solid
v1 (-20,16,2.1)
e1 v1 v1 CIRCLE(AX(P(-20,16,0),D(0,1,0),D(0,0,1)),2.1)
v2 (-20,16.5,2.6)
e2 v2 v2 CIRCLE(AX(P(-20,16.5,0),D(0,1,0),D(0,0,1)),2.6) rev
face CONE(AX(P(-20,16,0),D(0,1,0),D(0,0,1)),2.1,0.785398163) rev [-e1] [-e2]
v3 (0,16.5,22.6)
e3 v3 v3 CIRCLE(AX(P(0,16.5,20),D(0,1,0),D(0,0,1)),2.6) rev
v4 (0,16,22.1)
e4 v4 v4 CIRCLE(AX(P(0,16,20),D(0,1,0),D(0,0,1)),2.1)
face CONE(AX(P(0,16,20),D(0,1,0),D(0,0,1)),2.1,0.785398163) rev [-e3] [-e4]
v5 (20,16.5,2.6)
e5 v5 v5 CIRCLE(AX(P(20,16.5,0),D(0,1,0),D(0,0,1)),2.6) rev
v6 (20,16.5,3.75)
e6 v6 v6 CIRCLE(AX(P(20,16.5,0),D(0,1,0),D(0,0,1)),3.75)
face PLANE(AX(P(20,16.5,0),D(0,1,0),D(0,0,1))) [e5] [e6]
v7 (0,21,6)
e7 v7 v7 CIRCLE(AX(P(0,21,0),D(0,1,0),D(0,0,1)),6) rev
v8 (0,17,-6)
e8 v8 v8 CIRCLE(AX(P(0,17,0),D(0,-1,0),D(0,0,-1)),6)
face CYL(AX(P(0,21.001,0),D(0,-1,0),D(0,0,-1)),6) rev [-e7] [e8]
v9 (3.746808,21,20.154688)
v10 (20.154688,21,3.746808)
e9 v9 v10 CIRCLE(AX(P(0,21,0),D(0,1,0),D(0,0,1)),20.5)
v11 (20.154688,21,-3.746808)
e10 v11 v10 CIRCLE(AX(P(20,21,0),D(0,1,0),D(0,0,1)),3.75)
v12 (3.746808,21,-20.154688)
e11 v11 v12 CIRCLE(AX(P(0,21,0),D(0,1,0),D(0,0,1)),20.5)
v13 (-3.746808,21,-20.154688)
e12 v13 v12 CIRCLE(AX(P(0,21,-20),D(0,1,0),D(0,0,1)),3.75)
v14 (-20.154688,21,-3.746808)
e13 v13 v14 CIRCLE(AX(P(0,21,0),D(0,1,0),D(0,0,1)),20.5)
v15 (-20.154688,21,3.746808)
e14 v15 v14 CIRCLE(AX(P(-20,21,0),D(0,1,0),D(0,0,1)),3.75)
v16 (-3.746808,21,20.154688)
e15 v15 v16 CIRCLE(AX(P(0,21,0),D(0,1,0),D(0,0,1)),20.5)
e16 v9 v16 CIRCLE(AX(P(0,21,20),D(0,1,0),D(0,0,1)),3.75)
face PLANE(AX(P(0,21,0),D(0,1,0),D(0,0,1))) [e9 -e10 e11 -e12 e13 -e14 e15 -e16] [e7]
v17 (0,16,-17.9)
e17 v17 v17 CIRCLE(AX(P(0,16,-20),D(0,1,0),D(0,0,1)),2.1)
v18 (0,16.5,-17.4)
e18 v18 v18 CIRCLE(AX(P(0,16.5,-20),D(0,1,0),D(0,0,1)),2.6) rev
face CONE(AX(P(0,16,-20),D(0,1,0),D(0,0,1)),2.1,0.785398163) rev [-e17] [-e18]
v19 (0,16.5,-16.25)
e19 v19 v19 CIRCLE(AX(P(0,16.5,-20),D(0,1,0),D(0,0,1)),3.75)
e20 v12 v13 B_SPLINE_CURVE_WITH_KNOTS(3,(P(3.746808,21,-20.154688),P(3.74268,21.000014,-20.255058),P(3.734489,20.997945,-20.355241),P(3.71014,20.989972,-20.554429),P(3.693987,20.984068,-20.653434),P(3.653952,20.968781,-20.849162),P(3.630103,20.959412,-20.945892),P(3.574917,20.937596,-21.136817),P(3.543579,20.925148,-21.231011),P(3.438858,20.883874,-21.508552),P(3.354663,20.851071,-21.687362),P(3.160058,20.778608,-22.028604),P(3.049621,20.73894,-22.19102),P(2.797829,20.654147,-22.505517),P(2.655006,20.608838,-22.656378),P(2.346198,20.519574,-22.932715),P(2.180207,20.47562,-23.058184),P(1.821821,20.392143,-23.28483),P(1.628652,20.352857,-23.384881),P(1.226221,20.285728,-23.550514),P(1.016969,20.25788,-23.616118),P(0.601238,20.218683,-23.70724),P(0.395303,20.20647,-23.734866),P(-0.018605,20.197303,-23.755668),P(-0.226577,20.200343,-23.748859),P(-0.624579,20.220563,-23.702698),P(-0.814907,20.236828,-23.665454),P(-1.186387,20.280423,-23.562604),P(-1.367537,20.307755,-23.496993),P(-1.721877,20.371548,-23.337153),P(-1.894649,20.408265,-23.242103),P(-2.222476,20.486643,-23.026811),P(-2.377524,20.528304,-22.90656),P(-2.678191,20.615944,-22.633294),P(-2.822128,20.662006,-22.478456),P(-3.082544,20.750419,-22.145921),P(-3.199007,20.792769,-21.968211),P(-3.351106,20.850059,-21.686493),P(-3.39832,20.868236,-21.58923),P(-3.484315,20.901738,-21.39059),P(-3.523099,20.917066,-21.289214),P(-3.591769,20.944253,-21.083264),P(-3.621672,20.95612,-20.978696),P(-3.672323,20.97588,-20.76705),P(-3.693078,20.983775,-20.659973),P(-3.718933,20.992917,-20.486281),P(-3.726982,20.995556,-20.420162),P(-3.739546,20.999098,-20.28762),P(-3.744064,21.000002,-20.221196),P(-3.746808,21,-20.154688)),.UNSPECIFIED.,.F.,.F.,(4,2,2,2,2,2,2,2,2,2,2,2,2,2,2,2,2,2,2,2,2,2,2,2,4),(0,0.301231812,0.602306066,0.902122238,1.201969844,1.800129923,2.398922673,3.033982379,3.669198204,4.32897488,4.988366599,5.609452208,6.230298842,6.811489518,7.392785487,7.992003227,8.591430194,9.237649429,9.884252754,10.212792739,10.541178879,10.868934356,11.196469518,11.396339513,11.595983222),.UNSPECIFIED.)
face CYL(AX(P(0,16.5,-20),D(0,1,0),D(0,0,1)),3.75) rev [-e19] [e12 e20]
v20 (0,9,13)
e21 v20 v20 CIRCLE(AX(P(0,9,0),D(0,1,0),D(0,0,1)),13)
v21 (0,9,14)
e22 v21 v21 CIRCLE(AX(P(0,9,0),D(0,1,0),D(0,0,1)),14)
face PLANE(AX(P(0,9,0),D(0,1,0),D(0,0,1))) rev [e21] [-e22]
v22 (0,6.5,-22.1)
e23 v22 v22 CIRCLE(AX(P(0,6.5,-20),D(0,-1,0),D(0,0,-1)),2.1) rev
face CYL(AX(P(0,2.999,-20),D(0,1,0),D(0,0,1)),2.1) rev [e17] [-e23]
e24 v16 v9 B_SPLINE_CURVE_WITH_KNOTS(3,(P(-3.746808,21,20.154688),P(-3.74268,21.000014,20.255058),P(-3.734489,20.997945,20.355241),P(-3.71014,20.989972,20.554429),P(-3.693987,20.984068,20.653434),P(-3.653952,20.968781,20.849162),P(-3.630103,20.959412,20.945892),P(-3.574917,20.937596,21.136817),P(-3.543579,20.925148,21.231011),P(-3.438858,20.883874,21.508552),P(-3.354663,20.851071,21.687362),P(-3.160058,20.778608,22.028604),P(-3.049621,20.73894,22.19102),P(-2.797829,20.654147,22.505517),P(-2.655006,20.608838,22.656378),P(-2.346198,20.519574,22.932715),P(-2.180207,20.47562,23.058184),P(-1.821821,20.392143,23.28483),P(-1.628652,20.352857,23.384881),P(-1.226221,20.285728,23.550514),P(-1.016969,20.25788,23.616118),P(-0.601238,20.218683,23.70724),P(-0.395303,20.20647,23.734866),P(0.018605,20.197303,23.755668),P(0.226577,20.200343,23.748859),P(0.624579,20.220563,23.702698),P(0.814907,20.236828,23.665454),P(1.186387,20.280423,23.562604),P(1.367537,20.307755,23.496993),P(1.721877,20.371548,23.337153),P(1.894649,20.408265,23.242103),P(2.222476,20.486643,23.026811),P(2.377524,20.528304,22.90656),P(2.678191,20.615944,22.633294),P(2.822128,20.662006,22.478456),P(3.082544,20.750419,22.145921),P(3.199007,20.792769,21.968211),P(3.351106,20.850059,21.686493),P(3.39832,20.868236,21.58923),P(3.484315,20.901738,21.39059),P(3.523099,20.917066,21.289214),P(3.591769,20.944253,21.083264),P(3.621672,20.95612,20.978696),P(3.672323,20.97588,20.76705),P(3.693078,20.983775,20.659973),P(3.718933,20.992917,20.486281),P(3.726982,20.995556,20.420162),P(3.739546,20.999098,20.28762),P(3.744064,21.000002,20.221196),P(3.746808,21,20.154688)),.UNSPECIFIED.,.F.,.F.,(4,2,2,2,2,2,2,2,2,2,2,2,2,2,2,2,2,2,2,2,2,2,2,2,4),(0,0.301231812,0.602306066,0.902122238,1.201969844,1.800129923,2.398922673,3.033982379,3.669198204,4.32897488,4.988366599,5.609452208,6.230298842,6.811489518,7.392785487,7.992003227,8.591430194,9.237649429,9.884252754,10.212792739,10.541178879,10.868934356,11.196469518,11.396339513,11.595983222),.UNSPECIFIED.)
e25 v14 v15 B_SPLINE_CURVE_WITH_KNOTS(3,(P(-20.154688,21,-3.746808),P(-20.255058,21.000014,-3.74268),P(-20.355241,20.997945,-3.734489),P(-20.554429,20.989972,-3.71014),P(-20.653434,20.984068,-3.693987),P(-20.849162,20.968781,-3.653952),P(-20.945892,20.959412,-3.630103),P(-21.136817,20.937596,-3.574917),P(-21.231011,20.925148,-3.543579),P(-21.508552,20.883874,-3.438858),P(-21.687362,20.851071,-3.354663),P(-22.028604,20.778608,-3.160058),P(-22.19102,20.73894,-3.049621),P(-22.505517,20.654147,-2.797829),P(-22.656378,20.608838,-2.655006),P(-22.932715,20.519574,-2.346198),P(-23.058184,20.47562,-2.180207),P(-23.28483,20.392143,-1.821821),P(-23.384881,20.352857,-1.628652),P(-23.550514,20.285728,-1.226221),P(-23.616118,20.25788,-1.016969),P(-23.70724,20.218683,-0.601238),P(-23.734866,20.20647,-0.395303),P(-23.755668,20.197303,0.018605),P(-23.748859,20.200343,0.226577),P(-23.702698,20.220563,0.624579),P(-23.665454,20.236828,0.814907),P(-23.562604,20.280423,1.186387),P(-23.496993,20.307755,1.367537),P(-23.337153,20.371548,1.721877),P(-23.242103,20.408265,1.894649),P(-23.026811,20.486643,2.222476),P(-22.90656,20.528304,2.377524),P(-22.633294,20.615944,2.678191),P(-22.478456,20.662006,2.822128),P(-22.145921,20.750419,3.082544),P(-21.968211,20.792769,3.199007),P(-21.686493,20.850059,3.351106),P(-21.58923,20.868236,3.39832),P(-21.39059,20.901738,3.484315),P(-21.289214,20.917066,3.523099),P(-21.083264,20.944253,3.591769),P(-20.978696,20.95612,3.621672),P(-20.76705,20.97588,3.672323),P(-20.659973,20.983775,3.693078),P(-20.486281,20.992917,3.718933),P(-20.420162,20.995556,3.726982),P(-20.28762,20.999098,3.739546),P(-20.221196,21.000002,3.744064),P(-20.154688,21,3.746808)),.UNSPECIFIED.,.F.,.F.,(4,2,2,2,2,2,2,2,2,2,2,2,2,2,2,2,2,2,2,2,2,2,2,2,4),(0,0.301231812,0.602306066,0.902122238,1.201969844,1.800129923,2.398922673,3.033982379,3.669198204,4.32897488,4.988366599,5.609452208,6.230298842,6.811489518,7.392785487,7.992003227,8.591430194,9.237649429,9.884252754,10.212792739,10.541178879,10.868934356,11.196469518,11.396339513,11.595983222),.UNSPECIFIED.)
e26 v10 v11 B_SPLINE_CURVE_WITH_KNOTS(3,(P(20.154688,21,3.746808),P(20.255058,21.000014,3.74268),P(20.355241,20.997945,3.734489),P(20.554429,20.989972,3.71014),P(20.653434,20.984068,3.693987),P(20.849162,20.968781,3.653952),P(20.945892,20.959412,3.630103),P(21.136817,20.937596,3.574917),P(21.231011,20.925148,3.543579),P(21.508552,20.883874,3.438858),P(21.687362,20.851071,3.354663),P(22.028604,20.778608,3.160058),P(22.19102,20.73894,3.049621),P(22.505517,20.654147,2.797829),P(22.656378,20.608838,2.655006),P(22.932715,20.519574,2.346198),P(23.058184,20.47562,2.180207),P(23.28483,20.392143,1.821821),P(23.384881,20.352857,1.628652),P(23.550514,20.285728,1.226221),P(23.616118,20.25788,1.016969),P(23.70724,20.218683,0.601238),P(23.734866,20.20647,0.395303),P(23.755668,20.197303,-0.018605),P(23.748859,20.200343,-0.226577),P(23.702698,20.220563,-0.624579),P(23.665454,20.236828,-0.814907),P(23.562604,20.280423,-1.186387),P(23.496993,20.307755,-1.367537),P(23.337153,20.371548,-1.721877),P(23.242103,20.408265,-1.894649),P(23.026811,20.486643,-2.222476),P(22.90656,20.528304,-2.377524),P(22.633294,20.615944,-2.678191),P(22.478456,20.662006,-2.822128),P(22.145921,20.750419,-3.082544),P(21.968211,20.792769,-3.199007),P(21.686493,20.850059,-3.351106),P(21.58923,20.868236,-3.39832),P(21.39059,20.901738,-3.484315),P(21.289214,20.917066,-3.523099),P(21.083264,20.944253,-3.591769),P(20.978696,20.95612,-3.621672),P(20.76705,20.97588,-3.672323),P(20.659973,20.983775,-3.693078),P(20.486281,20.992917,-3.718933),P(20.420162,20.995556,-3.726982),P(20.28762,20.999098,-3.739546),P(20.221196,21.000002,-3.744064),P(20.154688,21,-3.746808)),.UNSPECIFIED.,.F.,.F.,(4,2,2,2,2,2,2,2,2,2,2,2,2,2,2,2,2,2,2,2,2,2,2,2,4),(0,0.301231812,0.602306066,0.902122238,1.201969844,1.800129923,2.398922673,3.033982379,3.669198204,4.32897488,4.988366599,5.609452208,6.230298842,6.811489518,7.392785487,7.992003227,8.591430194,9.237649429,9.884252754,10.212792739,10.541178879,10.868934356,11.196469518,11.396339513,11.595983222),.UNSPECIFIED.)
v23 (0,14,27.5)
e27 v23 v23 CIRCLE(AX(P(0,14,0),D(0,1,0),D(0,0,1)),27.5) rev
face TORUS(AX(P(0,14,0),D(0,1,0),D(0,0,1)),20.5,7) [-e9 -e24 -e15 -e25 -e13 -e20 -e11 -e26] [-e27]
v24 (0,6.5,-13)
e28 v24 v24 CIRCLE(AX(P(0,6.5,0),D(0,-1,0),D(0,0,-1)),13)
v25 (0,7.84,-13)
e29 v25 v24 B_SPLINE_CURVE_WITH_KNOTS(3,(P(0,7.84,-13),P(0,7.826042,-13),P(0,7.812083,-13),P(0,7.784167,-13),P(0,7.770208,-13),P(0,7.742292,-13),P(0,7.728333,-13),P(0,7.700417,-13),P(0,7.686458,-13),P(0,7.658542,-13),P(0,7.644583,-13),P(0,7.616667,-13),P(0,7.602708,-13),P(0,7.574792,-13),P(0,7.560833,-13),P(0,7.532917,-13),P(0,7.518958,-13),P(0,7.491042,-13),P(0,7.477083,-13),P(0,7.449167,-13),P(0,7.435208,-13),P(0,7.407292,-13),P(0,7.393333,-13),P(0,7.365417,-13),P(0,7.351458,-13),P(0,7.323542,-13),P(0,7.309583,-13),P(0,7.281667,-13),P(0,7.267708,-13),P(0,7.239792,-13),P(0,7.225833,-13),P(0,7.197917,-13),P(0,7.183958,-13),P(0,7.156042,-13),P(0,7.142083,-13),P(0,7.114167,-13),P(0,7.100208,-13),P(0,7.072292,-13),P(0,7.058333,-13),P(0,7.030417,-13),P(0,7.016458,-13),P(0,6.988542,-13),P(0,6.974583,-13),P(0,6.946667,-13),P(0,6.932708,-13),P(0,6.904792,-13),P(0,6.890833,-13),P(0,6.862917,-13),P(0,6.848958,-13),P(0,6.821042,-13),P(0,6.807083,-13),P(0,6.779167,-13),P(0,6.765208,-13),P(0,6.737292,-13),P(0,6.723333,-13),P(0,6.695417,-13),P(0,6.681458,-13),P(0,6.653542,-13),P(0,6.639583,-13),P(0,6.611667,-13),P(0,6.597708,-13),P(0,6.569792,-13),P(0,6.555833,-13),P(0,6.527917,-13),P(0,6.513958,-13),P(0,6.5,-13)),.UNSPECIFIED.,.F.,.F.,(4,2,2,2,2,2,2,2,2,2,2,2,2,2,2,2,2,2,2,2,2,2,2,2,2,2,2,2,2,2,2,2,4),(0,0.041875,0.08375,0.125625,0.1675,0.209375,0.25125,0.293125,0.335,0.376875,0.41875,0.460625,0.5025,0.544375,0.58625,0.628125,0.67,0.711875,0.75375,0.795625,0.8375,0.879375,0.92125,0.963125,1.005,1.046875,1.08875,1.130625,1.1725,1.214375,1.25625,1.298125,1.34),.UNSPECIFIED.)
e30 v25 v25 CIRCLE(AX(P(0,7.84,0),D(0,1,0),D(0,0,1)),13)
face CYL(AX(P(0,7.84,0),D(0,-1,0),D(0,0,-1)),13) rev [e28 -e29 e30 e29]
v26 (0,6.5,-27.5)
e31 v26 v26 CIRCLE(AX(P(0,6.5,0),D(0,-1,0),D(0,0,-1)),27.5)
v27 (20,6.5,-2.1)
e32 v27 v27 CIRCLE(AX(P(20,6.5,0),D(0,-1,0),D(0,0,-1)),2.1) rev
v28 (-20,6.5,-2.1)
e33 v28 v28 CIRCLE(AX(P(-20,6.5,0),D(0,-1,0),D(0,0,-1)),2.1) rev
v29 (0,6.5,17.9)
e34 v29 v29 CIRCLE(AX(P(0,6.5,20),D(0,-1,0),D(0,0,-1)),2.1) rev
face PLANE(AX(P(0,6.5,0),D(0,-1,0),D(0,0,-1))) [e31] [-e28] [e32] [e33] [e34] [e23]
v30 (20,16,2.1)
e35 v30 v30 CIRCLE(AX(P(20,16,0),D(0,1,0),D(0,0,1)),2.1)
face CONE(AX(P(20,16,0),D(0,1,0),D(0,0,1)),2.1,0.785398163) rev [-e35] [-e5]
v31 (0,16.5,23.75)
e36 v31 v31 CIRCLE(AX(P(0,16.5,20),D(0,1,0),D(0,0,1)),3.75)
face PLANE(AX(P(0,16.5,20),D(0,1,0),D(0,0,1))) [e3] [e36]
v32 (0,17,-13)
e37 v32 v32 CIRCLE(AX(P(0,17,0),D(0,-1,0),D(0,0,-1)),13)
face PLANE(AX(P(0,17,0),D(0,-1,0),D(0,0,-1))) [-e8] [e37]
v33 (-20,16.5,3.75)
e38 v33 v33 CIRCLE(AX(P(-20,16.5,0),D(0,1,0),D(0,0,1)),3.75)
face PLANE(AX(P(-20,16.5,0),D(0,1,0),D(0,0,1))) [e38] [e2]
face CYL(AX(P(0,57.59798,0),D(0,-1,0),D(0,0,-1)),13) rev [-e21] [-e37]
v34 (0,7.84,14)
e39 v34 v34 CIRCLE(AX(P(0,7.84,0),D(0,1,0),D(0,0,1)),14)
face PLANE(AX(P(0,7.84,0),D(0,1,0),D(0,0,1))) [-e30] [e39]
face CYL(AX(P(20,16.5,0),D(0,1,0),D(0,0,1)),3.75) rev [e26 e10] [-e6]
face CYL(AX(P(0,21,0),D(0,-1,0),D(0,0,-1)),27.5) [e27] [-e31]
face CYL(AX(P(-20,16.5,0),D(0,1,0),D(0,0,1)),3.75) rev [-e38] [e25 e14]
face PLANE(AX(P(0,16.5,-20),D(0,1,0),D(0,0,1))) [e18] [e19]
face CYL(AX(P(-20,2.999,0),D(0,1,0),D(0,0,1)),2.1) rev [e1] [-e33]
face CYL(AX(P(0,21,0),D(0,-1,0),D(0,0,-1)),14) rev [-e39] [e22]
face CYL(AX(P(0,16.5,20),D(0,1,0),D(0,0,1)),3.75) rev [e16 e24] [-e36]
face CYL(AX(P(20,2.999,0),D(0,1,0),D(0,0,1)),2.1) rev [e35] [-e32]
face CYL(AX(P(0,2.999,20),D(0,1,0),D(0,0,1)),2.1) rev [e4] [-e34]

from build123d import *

# Parameters (mm, degrees)
BOSS_EXTRUDE1_START       = 3
SKETCH1_R                 = 27.5
SKETCH1_R_2               = 14
BOSS_EXTRUDE1_DEPTH       = 18
BOSS_EXTRUDE2_START       = 18
SKETCH1_3_R               = 14
BOSS_EXTRUDE2_DEPTH       = 3
BOSS_EXTRUDE3_START       = 9
SKETCH1_4_R               = 14
SKETCH1_4_R_2             = 13
BOSS_EXTRUDE3_DEPTH       = 9
CUT_EXTRUDE1_REACH        = 44.854
SKETCH2_R                 = 2.1
SKETCH2_3_R               = 3.75
SKETCH2_3_R_2             = 2.1
CUT_EXTRUDE2_DEPTH        = 4.5
CHAMFER1_SIZE             = 0.5
BOSS_EXTRUDE4_START       = 3
BOSS_EXTRUDE4_OUTLINE_R   = 14
BOSS_EXTRUDE4_OUTLINE_R_2 = 13
BOSS_EXTRUDE4_DEPTH       = 4.84
BOSS_EXTRUDE5_START       = 1
SKETCH3_R                 = 13
BOSS_EXTRUDE5_DEPTH       = 1
SKETCH4_R                 = 35
CUT_EXTRUDE3_DEPTH        = 3.5
CUT_EXTRUDE5_REACH        = 42.283
SKETCH5_R                 = 6
FILLET1_R                 = 7


# Read off the part's stored shape, not the designer's step: Boss-Extrude4
with BuildPart() as part:
    # Sketch1 → Boss-Extrude1 (new body)
    with BuildSketch(Plane(origin=(0, 0, 0), x_dir=(1, 0, 0), z_dir=(0, 1, 0)).offset(BOSS_EXTRUDE1_START)):
        with Locations(Location((0, 0, 0), (0, 0, 270))):
            Circle(SKETCH1_R)
        with Locations(Location((0, 0, 0), (0, 0, 270))):
            Circle(SKETCH1_R_2, mode=Mode.SUBTRACT)
    extrude(amount=BOSS_EXTRUDE1_DEPTH)

    # Sketch1<3> → Boss-Extrude2 (add)
    with BuildSketch(Plane(origin=(0, 0, 0), x_dir=(1, 0, 0), z_dir=(0, 1, 0)).offset(BOSS_EXTRUDE2_START)):
        with Locations(Location((0, 0, 0), (0, 0, 270))):
            Circle(SKETCH1_3_R)
    extrude(amount=BOSS_EXTRUDE2_DEPTH)

    # Sketch1<4> → Boss-Extrude3 (add)
    with BuildSketch(Plane(origin=(0, 0, 0), x_dir=(1, 0, 0), z_dir=(0, 1, 0)).offset(BOSS_EXTRUDE3_START)):
        with Locations(Location((0, 0, 0), (0, 0, 270))):
            Circle(SKETCH1_4_R)
        with Locations(Location((0, 0, 0), (0, 0, 270))):
            Circle(SKETCH1_4_R_2, mode=Mode.SUBTRACT)
    extrude(amount=BOSS_EXTRUDE3_DEPTH)

    # Sketch2 → Cut-Extrude1 (cut, up to next)
    with BuildSketch(Plane(origin=(0, 21, 0), x_dir=(1, 0, 0), z_dir=(0, 1, 0)), mode=Mode.PRIVATE) as cut_extrude1_sk1:
        with Locations(Location((0, -20, 0), (0, 0, 270))):
            Circle(SKETCH2_R)
    cut_extrude1_tool1 = extrude(cut_extrude1_sk1.sketch, amount=-CUT_EXTRUDE1_REACH, mode=Mode.PRIVATE) & part.part
    # Sketch2 → Cut-Extrude1 (cut, up to next)
    with BuildSketch(Plane(origin=(0, 21, 0), x_dir=(1, 0, 0), z_dir=(0, 1, 0)), mode=Mode.PRIVATE) as cut_extrude1_sk2:
        with Locations(Location((-20, 0, 0), (0, 0, 270))):
            Circle(SKETCH2_R)
    cut_extrude1_tool2 = extrude(cut_extrude1_sk2.sketch, amount=-CUT_EXTRUDE1_REACH, mode=Mode.PRIVATE) & part.part
    # Sketch2 → Cut-Extrude1 (cut, up to next)
    with BuildSketch(Plane(origin=(0, 21, 0), x_dir=(1, 0, 0), z_dir=(0, 1, 0)), mode=Mode.PRIVATE) as cut_extrude1_sk3:
        with Locations(Location((20, 0, 0), (0, 0, 270))):
            Circle(SKETCH2_R)
    cut_extrude1_tool3 = extrude(cut_extrude1_sk3.sketch, amount=-CUT_EXTRUDE1_REACH, mode=Mode.PRIVATE) & part.part
    # Sketch2 → Cut-Extrude1 (cut, up to next)
    with BuildSketch(Plane(origin=(0, 21, 0), x_dir=(1, 0, 0), z_dir=(0, 1, 0)), mode=Mode.PRIVATE) as cut_extrude1_sk4:
        with Locations(Location((0, 20, 0), (0, 0, 270))):
            Circle(SKETCH2_R)
    cut_extrude1_tool4 = extrude(cut_extrude1_sk4.sketch, amount=-CUT_EXTRUDE1_REACH, mode=Mode.PRIVATE) & part.part
    add(cut_extrude1_tool1.solids().sort_by_distance((0, 21, 20))[0], mode=Mode.SUBTRACT)
    add(cut_extrude1_tool2.solids().sort_by_distance((-20, 21, 0))[0], mode=Mode.SUBTRACT)
    add(cut_extrude1_tool3.solids().sort_by_distance((20, 21, 0))[0], mode=Mode.SUBTRACT)
    add(cut_extrude1_tool4.solids().sort_by_distance((0, 21, -20))[0], mode=Mode.SUBTRACT)

    # Sketch2<3> → Cut-Extrude2 (cut)
    # profile 1 of 4: a face of its own
    with BuildSketch(Plane(origin=(0, 21, 0), x_dir=(1, 0, 0), z_dir=(0, 1, 0))):
        with Locations(Location((0, -20, 0), (0, 0, 270))):
            Circle(SKETCH2_3_R)
        with Locations(Location((0, -20, 0), (0, 0, 270))):
            Circle(SKETCH2_3_R_2, mode=Mode.SUBTRACT)
    # profile 2 of 4: a face of its own
    with BuildSketch(Plane(origin=(0, 21, 0), x_dir=(1, 0, 0), z_dir=(0, 1, 0))):
        with Locations(Location((-20, 0, 0), (0, 0, 270))):
            Circle(SKETCH2_3_R)
        with Locations(Location((-20, 0, 0), (0, 0, 270))):
            Circle(SKETCH2_3_R_2, mode=Mode.SUBTRACT)
    # profile 3 of 4: a face of its own
    with BuildSketch(Plane(origin=(0, 21, 0), x_dir=(1, 0, 0), z_dir=(0, 1, 0))):
        with Locations(Location((0, 20, 0), (0, 0, 270))):
            Circle(SKETCH2_3_R)
        with Locations(Location((0, 20, 0), (0, 0, 270))):
            Circle(SKETCH2_3_R_2, mode=Mode.SUBTRACT)
    # profile 4 of 4: a face of its own
    with BuildSketch(Plane(origin=(0, 21, 0), x_dir=(1, 0, 0), z_dir=(0, 1, 0))):
        with Locations(Location((20, 0, 0), (0, 0, 270))):
            Circle(SKETCH2_3_R)
        with Locations(Location((20, 0, 0), (0, 0, 270))):
            Circle(SKETCH2_3_R_2, mode=Mode.SUBTRACT)
    extrude(amount=-CUT_EXTRUDE2_DEPTH, mode=Mode.SUBTRACT)

    # Chamfer1
    chamfer1_edges = [part.edges().sort_by_distance(p)[0] for p in [
        (0, 16.5, 17.9),
        (-20, 16.5, -2.1),
        (0, 16.5, -22.1),
        (20, 16.5, -2.1),
    ]]
    chamfer(chamfer1_edges, length=CHAMFER1_SIZE)

    # Boss-Extrude4 outline → Boss-Extrude4 (add)
    with BuildSketch(Plane(origin=(0, 0, 0), x_dir=(1, 0, 0), z_dir=(0, 1, 0)).offset(BOSS_EXTRUDE4_START)):
        Circle(BOSS_EXTRUDE4_OUTLINE_R)
        Circle(BOSS_EXTRUDE4_OUTLINE_R_2, mode=Mode.SUBTRACT)
    extrude(amount=BOSS_EXTRUDE4_DEPTH)

    # Sketch3 → Boss-Extrude5 (add)
    with BuildSketch(Plane.XZ.offset(-18).offset(BOSS_EXTRUDE5_START)):
        with Locations(Location((0, 0, 0), (0, 0, 270))):
            Circle(SKETCH3_R)
    extrude(amount=-BOSS_EXTRUDE5_DEPTH)

    # Sketch4 → Cut-Extrude3 (cut)
    with BuildSketch(Plane.XZ.offset(-3)):
        Circle(SKETCH4_R)
    extrude(amount=-CUT_EXTRUDE3_DEPTH, mode=Mode.SUBTRACT)

    # Sketch5 → Cut-Extrude5 (cut, up to next)
    with BuildSketch(Plane.XZ.offset(-17), mode=Mode.PRIVATE) as cut_extrude5_sk1:
        with Locations(Location((0, 0, 0), (0, 0, 270))):
            Circle(SKETCH5_R)
    cut_extrude5_tool1 = extrude(cut_extrude5_sk1.sketch, amount=-CUT_EXTRUDE5_REACH, mode=Mode.PRIVATE) & part.part
    add(cut_extrude5_tool1.solids().sort_by_distance((0, 17, 0))[0], mode=Mode.SUBTRACT)

    # Fillet1
    # the kernel refuses this fillet: 7 mm, written as the material it takes off along each edge
    with BuildSketch(Plane(origin=(0, 21, 0), x_dir=(0, 0, 1), z_dir=(-1, 0, 0))) as fillet1_piece_1:
        with BuildLine():
            CenterArc((27.5 - FILLET1_R, -FILLET1_R), FILLET1_R, 0, 90)
            Line((27.5 - FILLET1_R, 0), (27.5, 0))
            Line((27.5, 0), (27.5, -FILLET1_R))
        make_face()
    revolve(axis=Axis((0, 21, 0), (0, 1, 0)), mode=Mode.SUBTRACT)


solid = part.part
